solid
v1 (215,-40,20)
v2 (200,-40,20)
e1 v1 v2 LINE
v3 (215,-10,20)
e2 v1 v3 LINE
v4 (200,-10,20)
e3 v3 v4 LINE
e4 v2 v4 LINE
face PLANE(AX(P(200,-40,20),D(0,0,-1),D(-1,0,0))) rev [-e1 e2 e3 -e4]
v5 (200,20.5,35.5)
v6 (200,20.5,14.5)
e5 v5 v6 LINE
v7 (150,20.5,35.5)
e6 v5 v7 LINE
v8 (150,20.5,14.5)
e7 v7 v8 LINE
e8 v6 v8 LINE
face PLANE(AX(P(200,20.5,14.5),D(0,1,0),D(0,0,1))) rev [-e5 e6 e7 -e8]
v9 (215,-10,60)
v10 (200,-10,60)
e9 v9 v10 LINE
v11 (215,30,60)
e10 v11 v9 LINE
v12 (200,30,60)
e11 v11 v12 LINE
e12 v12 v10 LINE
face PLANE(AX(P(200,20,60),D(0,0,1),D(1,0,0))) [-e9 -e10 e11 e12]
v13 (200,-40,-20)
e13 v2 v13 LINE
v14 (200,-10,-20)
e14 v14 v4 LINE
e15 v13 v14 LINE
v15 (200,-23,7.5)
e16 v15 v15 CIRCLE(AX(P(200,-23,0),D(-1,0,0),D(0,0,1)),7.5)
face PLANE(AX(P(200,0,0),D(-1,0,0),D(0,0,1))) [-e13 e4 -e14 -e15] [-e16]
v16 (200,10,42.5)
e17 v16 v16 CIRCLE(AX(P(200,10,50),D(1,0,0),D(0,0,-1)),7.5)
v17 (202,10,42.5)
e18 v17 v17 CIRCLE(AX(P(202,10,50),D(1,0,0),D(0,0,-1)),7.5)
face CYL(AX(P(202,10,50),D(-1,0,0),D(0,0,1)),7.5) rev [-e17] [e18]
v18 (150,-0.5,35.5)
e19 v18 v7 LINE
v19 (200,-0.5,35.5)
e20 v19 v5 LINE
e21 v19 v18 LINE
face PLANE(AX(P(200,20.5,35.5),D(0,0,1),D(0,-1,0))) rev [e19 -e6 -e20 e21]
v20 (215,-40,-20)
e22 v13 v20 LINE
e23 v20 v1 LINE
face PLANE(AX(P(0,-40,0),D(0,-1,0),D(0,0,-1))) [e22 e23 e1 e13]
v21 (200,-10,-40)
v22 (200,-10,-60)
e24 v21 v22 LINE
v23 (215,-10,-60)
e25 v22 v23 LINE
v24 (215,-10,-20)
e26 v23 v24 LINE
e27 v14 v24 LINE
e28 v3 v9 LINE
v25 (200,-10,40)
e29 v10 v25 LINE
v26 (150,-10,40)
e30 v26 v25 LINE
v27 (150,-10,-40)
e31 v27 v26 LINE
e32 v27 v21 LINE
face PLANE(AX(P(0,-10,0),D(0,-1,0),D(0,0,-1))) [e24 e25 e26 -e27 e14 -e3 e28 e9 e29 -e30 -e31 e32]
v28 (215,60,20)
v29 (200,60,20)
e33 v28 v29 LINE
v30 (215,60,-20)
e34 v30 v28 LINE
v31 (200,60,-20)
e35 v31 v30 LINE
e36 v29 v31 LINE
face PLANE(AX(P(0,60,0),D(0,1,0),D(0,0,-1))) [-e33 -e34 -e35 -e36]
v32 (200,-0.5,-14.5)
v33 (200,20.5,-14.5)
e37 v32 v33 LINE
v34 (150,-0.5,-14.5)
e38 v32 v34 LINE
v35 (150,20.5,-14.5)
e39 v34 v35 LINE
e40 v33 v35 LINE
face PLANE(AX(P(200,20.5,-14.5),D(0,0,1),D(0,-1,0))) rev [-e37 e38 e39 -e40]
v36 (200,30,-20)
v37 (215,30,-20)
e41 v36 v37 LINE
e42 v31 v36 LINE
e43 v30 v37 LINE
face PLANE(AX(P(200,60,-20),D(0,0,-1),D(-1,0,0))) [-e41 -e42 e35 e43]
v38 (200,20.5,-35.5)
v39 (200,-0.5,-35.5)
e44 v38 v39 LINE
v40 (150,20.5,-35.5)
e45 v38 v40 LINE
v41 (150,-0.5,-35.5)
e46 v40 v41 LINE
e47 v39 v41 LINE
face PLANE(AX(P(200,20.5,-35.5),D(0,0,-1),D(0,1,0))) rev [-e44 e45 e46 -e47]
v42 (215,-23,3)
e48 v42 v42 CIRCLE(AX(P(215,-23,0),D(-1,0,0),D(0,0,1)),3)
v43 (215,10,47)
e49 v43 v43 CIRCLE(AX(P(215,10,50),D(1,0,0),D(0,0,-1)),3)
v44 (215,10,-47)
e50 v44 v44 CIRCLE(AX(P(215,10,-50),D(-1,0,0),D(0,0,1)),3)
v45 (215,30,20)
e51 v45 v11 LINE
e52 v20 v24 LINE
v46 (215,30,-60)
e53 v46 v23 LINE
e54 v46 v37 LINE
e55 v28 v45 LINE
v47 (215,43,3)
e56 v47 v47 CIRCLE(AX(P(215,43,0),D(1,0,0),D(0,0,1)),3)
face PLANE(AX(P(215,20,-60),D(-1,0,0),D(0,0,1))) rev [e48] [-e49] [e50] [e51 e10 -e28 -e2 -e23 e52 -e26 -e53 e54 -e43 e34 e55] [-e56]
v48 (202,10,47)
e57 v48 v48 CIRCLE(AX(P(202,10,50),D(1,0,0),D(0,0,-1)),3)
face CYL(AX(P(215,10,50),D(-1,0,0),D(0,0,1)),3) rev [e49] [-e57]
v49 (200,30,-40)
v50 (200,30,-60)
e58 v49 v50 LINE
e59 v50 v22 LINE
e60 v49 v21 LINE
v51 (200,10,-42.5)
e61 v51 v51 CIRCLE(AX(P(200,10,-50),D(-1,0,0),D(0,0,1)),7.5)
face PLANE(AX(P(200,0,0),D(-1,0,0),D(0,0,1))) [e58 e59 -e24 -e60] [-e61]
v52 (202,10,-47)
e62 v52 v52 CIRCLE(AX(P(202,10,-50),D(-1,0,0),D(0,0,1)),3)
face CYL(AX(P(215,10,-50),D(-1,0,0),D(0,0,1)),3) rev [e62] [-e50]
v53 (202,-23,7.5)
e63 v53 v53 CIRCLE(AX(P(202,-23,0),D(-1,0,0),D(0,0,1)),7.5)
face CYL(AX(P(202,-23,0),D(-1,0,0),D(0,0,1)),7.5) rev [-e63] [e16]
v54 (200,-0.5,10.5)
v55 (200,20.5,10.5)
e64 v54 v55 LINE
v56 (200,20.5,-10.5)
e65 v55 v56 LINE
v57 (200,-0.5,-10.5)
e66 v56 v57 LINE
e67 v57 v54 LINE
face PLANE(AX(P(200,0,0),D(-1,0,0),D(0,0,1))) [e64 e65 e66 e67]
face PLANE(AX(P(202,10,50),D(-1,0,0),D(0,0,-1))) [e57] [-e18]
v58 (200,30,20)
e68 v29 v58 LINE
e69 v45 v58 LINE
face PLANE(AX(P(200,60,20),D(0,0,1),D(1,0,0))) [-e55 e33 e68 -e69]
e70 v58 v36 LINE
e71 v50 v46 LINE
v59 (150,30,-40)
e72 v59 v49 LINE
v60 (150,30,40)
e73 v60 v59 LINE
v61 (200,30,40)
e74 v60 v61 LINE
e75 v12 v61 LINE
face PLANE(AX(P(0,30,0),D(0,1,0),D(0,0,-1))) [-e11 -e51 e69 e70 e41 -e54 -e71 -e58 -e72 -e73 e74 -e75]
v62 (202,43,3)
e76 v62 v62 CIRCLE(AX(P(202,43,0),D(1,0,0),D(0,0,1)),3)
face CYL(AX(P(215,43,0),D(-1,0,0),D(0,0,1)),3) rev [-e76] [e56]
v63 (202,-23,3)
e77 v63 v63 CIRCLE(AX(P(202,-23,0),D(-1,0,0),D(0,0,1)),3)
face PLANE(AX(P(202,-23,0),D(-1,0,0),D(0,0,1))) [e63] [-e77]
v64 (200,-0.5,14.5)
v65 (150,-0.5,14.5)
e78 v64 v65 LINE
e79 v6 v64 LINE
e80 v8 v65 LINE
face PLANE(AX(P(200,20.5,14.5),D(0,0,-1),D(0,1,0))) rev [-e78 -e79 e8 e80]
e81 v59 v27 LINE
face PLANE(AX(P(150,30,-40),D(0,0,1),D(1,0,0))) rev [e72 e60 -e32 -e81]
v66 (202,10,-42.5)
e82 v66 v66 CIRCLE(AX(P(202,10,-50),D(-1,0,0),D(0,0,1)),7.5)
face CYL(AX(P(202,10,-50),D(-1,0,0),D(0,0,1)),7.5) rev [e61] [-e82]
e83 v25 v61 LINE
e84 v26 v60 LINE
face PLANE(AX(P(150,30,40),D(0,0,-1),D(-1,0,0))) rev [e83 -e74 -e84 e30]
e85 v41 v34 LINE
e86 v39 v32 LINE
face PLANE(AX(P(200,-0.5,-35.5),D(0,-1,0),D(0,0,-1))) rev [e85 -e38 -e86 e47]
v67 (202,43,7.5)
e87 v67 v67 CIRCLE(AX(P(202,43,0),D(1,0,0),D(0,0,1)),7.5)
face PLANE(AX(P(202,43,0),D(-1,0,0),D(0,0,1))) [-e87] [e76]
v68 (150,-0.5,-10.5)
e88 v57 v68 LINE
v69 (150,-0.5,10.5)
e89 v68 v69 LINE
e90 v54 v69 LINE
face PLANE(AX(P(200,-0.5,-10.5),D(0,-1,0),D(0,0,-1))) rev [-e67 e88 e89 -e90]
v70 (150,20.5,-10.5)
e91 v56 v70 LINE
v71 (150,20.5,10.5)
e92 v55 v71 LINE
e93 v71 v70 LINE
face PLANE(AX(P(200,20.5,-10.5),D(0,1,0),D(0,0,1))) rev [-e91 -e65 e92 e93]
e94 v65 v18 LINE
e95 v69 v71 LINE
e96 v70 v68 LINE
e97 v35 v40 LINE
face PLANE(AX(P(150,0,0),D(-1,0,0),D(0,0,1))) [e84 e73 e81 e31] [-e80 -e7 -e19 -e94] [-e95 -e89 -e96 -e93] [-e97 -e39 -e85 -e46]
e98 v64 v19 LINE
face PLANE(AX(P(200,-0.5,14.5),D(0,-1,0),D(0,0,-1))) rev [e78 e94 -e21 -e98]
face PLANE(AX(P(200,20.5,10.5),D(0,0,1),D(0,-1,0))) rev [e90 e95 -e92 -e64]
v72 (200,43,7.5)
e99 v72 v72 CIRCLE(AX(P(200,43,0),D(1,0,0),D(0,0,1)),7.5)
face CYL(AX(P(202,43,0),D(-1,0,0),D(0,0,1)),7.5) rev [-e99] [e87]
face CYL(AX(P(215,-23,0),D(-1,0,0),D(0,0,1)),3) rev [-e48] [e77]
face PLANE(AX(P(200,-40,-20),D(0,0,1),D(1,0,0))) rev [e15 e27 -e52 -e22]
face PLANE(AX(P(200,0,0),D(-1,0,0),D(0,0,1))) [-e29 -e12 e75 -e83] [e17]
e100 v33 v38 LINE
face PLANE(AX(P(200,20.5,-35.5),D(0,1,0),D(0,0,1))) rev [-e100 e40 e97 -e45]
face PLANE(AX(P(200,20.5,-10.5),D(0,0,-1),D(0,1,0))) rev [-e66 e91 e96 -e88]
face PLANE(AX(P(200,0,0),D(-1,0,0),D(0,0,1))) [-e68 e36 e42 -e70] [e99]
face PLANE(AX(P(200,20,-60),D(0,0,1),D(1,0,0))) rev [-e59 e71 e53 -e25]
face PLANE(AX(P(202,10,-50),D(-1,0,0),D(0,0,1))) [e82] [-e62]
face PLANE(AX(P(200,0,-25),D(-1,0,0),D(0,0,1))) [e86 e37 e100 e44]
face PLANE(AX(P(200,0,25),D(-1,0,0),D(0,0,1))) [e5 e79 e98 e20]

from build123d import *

# Parameters (mm, degrees)
STOCK_EXHAUST_M5_WASHER15_B_1_START         = 200
STOCK_EXHAUST_M5_WASHER15_B_1_OUTLINE_R     = 7.5
STOCK_EXHAUST_M5_WASHER15_B_1_DEPTH         = 15
STOCK_EXHAUST_M5_WASHER15_B_1_START_2       = 202
STOCK_EXHAUST_M5_WASHER15_B_1_2_OUTLINE_R   = 7.5
STOCK_EXHAUST_M5_WASHER15_B_1_2_OUTLINE_R_2 = 3
STOCK_EXHAUST_M5_WASHER15_B_1_2_DEPTH       = 13
SKETCH1_W                                   = 80
SKETCH1_H                                   = 40
BOSS_EXTRUDE1_DEPTH                         = 50
SKETCH2_W                                   = 21
SKETCH2_H                                   = 21
CUT_EXTRUDE1_DEPTH                          = 50
LPATTERN1_COUNT                             = 2
LPATTERN1_PITCH                             = 25
LPATTERN1_COL_COUNT                         = 2
LPATTERN1_COL_PITCH                         = 25


# Read off the part's stored shape, not the designer's step: Stock-Exhaust_M5_washer15_B-1
with BuildPart() as part:
    # Stock-Exhaust_M5_washer15_B-1 outline → Stock-Exhaust_M5_washer15_B-1 (new body)
    with BuildSketch(Plane.YZ.offset(STOCK_EXHAUST_M5_WASHER15_B_1_START)):
        Polygon((-40, -20), (-10, -20), (-10, -60), (30, -60), (30, -20), (60, -20), (60, 20), (30, 20), (30, 60), (-10, 60), (-10, 20), (-40, 20), align=None)
        with Locations((10, -50)):
            Circle(STOCK_EXHAUST_M5_WASHER15_B_1_OUTLINE_R, mode=Mode.SUBTRACT)
        with Locations((-23, 0)):
            Circle(STOCK_EXHAUST_M5_WASHER15_B_1_OUTLINE_R, mode=Mode.SUBTRACT)
        with Locations((43, 0)):
            Circle(STOCK_EXHAUST_M5_WASHER15_B_1_OUTLINE_R, mode=Mode.SUBTRACT)
        with Locations((10, 50)):
            Circle(STOCK_EXHAUST_M5_WASHER15_B_1_OUTLINE_R, mode=Mode.SUBTRACT)
    extrude(amount=STOCK_EXHAUST_M5_WASHER15_B_1_DEPTH)

    # Stock-Exhaust_M5_washer15_B-1 2 outline → Stock-Exhaust_M5_washer15_B-1 2 (add)
    # profile 1 of 4: a face of its own
    with BuildSketch(Plane.YZ.offset(STOCK_EXHAUST_M5_WASHER15_B_1_START_2)):
        with Locations((43, 0)):
            Circle(STOCK_EXHAUST_M5_WASHER15_B_1_2_OUTLINE_R)
        with Locations((43, 0)):
            Circle(STOCK_EXHAUST_M5_WASHER15_B_1_2_OUTLINE_R_2, mode=Mode.SUBTRACT)
    # profile 2 of 4: a face of its own
    with BuildSketch(Plane.YZ.offset(STOCK_EXHAUST_M5_WASHER15_B_1_START_2)):
        with Locations((10, 50)):
            Circle(STOCK_EXHAUST_M5_WASHER15_B_1_2_OUTLINE_R)
        with Locations((10, 50)):
            Circle(STOCK_EXHAUST_M5_WASHER15_B_1_2_OUTLINE_R_2, mode=Mode.SUBTRACT)
    # profile 3 of 4: a face of its own
    with BuildSketch(Plane.YZ.offset(STOCK_EXHAUST_M5_WASHER15_B_1_START_2)):
        with Locations((10, -50)):
            Circle(STOCK_EXHAUST_M5_WASHER15_B_1_2_OUTLINE_R)
        with Locations((10, -50)):
            Circle(STOCK_EXHAUST_M5_WASHER15_B_1_2_OUTLINE_R_2, mode=Mode.SUBTRACT)
    # profile 4 of 4: a face of its own
    with BuildSketch(Plane.YZ.offset(STOCK_EXHAUST_M5_WASHER15_B_1_START_2)):
        with Locations((-23, 0)):
            Circle(STOCK_EXHAUST_M5_WASHER15_B_1_2_OUTLINE_R)
        with Locations((-23, 0)):
            Circle(STOCK_EXHAUST_M5_WASHER15_B_1_2_OUTLINE_R_2, mode=Mode.SUBTRACT)
    extrude(amount=STOCK_EXHAUST_M5_WASHER15_B_1_2_DEPTH)

    # Sketch1 → Boss-Extrude1 (add)
    with BuildSketch(Plane.ZY.offset(-200)):
        with Locations((0, 10)):
            Rectangle(SKETCH1_W, SKETCH1_H)
    extrude(amount=BOSS_EXTRUDE1_DEPTH)

    # Sketch2 → Cut-Extrude1 (cut)
    with BuildSketch(Plane.ZY.offset(-150)):
        with Locations((0, 10)):
            Rectangle(SKETCH2_W, SKETCH2_H)
    cut_extrude1 = extrude(amount=-CUT_EXTRUDE1_DEPTH, mode=Mode.SUBTRACT)

    # LPattern1: Cut-Extrude1 ×2
    with Locations(*[(0, 0, i * LPATTERN1_PITCH) for i in range(1, LPATTERN1_COUNT)]):
        add(cut_extrude1, mode=Mode.SUBTRACT)

    # LPattern1 col: Cut-Extrude1 ×2
    with Locations(*[(0, 0, -i * LPATTERN1_COL_PITCH) for i in range(1, LPATTERN1_COL_COUNT)]):
        add(cut_extrude1, mode=Mode.SUBTRACT)


solid = part.part
